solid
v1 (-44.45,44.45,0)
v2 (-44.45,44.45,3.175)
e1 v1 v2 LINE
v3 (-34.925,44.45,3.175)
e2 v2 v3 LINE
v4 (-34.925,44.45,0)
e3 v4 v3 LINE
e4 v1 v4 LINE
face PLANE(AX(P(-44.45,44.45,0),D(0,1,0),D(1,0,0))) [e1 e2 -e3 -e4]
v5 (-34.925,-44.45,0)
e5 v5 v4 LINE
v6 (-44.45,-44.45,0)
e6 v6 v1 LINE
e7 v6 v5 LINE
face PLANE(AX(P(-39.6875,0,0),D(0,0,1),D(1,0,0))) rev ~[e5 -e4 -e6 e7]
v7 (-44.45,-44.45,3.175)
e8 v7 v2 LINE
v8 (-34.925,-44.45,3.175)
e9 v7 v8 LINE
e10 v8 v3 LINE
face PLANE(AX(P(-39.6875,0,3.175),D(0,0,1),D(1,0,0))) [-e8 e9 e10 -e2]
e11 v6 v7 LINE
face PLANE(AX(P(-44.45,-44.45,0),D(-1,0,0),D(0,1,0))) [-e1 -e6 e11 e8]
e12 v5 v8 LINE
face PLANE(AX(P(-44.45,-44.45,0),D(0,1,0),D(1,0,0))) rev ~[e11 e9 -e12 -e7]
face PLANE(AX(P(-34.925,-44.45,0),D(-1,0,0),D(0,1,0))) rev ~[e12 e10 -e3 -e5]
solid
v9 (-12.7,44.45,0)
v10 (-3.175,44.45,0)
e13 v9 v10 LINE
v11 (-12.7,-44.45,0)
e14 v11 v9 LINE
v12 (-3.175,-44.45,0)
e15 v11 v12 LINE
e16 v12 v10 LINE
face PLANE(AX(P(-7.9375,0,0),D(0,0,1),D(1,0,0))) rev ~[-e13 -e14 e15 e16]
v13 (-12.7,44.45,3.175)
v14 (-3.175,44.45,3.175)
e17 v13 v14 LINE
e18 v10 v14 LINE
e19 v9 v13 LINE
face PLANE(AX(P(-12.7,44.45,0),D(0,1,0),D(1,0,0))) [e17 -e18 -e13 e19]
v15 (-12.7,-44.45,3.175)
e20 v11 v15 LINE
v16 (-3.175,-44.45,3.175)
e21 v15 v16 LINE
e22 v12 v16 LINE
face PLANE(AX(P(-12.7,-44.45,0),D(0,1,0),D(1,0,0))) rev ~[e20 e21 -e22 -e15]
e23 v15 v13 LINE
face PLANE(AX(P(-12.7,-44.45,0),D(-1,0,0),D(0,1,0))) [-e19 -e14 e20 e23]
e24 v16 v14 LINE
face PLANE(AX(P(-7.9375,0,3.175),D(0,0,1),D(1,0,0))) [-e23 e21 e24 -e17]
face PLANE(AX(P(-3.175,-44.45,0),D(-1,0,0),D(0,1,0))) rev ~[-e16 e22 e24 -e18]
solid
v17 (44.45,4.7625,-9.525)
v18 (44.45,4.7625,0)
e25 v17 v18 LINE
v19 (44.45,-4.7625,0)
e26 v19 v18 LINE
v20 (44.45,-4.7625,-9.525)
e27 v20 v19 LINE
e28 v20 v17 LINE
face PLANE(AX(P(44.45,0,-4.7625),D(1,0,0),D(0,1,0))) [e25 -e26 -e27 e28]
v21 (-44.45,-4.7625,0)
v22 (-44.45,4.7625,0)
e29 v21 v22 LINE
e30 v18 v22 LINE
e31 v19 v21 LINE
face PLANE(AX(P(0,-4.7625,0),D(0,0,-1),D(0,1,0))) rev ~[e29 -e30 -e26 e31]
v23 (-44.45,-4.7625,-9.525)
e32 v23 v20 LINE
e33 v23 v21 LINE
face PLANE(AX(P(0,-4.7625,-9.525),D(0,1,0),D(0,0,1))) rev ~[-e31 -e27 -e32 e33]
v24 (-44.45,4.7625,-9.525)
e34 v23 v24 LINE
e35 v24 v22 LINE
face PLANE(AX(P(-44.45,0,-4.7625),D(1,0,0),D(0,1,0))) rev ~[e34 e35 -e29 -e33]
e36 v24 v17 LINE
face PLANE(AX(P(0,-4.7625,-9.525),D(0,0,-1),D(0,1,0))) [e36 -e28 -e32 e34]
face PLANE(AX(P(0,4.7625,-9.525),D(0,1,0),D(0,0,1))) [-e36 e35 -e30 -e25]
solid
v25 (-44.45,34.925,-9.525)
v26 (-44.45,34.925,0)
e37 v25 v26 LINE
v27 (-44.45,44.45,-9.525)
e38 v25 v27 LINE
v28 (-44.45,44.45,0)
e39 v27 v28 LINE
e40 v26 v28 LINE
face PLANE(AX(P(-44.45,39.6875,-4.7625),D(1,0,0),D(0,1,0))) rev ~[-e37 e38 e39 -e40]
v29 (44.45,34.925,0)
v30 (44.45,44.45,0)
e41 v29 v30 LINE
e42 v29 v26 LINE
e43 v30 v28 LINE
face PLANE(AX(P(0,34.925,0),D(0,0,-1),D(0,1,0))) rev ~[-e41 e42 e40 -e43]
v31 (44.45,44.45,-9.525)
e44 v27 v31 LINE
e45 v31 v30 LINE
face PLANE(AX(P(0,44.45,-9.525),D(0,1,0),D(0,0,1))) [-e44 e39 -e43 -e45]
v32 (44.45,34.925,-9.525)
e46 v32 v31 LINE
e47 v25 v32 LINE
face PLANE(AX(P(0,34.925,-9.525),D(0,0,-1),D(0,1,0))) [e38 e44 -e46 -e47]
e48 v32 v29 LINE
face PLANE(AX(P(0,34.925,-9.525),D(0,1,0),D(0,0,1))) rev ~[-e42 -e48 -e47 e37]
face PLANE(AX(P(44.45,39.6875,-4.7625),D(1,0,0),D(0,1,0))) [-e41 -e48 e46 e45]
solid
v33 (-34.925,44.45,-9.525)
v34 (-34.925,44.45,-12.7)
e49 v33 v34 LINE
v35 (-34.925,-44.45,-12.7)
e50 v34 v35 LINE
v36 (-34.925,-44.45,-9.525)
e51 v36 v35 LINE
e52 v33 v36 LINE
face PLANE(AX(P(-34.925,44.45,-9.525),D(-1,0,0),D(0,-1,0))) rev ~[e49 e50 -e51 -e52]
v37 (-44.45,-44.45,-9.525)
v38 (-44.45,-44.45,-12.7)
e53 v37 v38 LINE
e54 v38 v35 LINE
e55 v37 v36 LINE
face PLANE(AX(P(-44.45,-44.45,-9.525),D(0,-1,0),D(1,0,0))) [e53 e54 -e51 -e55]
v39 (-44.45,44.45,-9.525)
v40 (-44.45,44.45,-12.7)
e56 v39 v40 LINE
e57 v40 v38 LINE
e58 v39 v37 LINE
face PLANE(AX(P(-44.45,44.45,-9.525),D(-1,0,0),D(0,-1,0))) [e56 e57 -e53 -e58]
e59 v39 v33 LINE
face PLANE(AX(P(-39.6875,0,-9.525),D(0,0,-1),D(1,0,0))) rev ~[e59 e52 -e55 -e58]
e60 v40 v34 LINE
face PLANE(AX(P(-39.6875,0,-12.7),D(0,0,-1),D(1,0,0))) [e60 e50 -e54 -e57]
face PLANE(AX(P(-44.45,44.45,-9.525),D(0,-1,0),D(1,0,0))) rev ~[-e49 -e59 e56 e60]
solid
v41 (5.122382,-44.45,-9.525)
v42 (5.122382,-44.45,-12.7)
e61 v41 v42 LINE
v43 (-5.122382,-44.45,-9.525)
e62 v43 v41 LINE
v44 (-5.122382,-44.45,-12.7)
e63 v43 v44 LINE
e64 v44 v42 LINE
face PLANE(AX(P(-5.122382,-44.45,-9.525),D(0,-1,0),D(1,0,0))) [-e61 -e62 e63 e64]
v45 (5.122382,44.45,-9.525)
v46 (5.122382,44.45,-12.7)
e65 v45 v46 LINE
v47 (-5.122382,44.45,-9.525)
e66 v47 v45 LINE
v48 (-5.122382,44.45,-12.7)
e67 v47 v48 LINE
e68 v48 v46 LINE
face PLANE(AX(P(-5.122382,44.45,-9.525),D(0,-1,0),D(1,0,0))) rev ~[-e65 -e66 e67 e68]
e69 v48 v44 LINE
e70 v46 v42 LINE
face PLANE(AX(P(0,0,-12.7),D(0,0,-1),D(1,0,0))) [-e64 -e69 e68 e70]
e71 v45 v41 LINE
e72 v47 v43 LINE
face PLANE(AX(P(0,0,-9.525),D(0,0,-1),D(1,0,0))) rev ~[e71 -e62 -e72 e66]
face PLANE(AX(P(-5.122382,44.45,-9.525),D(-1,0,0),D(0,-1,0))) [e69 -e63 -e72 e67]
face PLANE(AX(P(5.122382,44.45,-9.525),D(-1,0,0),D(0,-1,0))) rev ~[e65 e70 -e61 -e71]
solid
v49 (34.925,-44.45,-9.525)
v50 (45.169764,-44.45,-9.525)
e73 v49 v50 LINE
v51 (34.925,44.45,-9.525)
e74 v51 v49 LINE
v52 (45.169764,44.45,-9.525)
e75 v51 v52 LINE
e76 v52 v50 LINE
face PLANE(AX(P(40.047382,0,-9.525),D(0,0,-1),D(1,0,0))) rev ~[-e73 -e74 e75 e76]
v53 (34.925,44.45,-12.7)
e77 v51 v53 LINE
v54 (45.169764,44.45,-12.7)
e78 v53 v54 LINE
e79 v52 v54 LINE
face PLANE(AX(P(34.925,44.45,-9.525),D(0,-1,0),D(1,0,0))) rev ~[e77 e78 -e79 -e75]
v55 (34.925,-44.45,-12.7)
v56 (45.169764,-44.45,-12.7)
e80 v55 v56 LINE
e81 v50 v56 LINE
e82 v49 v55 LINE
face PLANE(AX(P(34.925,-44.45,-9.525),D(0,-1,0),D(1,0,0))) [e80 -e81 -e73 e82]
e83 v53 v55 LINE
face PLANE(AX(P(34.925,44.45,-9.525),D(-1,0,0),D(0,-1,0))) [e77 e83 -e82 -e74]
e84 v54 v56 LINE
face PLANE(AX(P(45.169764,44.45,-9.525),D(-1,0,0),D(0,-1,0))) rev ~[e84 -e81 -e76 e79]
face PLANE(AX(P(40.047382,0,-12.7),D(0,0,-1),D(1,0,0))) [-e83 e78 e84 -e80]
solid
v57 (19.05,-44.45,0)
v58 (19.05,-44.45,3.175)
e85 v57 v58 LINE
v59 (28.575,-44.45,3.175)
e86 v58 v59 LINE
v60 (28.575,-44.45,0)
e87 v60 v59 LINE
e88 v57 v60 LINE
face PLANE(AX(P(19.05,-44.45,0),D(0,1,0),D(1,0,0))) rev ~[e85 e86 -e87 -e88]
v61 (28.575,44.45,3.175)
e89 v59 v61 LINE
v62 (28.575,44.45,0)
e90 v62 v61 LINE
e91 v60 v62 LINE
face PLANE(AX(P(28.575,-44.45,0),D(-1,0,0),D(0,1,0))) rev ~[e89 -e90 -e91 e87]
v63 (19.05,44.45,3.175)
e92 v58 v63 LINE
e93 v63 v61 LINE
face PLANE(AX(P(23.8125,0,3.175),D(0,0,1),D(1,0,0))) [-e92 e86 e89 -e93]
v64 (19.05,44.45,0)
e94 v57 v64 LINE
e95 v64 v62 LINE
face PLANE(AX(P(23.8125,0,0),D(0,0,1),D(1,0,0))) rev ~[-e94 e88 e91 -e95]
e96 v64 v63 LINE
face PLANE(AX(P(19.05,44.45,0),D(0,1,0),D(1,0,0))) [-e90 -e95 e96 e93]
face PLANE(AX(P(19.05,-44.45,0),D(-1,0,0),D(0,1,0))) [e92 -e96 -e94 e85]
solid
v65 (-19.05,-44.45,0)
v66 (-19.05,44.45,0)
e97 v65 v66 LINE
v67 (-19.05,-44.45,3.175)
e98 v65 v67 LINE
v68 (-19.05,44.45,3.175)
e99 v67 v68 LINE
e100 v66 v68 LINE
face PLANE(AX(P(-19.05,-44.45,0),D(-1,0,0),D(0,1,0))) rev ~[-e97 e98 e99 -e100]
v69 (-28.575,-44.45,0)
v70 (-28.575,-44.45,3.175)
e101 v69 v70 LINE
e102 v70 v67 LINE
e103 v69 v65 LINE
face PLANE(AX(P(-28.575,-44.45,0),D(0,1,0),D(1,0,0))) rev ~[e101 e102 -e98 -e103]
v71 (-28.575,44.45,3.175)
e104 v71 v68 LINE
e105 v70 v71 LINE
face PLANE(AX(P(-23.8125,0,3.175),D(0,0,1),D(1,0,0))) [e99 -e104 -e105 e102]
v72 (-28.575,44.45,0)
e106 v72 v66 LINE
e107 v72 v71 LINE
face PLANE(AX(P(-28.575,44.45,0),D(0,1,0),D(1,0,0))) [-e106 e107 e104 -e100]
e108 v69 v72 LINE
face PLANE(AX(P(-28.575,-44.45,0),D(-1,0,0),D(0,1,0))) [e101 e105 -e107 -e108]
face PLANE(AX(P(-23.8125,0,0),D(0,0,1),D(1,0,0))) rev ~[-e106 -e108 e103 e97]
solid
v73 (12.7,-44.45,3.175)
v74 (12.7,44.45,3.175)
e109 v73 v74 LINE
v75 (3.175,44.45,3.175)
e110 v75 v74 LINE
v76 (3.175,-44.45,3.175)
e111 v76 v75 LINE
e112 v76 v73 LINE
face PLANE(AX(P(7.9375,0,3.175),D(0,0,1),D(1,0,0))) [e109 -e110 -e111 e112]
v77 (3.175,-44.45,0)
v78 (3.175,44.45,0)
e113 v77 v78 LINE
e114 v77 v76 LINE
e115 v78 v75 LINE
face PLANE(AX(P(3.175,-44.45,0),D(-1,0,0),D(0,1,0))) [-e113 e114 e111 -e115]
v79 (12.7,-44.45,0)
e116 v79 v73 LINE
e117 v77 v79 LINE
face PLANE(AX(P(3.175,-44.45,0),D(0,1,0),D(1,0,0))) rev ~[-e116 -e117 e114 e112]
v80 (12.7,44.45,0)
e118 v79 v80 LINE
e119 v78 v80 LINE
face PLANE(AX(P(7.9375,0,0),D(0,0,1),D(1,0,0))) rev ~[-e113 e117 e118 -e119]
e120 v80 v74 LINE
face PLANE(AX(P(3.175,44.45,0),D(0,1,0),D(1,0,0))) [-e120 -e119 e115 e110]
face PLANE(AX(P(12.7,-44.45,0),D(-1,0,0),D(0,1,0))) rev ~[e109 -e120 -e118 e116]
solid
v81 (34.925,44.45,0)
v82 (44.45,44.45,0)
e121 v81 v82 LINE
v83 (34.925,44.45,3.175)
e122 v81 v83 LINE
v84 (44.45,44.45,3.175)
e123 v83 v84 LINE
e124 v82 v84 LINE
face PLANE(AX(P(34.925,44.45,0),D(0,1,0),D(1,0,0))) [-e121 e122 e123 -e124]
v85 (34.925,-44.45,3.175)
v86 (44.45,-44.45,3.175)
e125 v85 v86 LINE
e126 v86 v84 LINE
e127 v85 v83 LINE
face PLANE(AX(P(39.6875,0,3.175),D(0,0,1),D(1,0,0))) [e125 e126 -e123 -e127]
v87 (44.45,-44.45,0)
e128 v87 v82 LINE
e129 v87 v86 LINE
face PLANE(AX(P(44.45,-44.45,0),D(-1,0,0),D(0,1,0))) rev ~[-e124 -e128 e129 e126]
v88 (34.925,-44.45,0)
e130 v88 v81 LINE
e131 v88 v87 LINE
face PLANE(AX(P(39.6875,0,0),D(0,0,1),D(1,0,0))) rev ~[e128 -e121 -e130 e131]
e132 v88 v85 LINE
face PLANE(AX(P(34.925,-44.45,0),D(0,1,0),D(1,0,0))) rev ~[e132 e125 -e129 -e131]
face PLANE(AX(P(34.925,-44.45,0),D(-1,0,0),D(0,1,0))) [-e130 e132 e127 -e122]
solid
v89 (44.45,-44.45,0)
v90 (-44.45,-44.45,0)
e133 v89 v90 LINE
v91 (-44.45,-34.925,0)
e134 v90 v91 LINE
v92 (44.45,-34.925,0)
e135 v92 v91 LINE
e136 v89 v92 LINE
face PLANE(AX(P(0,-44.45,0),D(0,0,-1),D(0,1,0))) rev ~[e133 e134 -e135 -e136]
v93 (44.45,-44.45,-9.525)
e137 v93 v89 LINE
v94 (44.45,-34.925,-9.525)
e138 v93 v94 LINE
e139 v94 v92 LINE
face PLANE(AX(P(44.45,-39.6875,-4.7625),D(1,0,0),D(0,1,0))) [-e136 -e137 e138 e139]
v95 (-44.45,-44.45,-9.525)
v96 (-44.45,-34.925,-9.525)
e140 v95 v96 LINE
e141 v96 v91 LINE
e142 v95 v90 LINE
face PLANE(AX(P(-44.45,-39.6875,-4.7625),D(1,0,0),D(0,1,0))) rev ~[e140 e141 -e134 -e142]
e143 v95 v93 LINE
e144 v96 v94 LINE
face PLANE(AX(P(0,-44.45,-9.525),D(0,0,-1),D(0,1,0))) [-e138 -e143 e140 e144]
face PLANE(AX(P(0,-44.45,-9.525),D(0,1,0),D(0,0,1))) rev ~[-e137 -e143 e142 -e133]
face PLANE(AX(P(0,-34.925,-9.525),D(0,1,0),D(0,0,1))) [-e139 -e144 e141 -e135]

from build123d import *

# Parameters (mm, degrees)
F1_W          = 9.525
F1_H          = 88.9
F2_DEPTH      = 3.175
F3_W          = 9.525
F3_H          = 9.525
F4_DEPTH      = 44.45
F4_DEPTH_BACK = 44.45
F5_W          = 10.2447643876
F5_H          = 88.9
F6_DEPTH      = 3.175
F5_W_2        = 9.5249999999


# Not quite as in the source:
# - a variable given as a bare number and used for a length is read in inches; the dataset says mm whatever the document's units were


with BuildPart() as f2:
    # F1 (on Top) → F2 (new body)
    with BuildSketch(Plane.XY):
        with Locations((-39.6875, 0)):
            Rectangle(F1_W, F1_H)
    extrude(amount=F2_DEPTH)


with BuildPart() as f2b:
    # F1 (on Top) → F2, piece 2 (new body)
    with BuildSketch(Plane.XY):
        with Locations((-23.8125, 0)):
            Rectangle(F1_W, F1_H)
    extrude(amount=F2_DEPTH)


with BuildPart() as f2c:
    # F1 (on Top) → F2, piece 3 (new body)
    with BuildSketch(Plane.XY):
        with Locations((-7.9375, 0)):
            Rectangle(F1_W, F1_H)
    extrude(amount=F2_DEPTH)


with BuildPart() as f2d:
    # F1 (on Top) → F2, piece 4 (new body)
    with BuildSketch(Plane.XY):
        with Locations((7.9375, 0)):
            Rectangle(F1_W, F1_H)
    extrude(amount=F2_DEPTH)


with BuildPart() as f2e:
    # F1 (on Top) → F2, piece 5 (new body)
    with BuildSketch(Plane.XY):
        with Locations((23.8125, 0)):
            Rectangle(F1_W, F1_H)
    extrude(amount=F2_DEPTH)


with BuildPart() as f2f:
    # F1 (on Top) → F2, piece 6 (new body)
    with BuildSketch(Plane.XY):
        with Locations((39.6875, 0)):
            Rectangle(F1_W, F1_H)
    extrude(amount=F2_DEPTH)


with BuildPart() as f4:
    # F3 (on Right) → F4 (new body, two sides)
    with BuildSketch(Plane.YZ) as f4_sk:
        with Locations((-39.6875, -4.7625)):
            Rectangle(F3_W, F3_H)
    extrude(amount=F4_DEPTH)
    extrude(f4_sk.sketch, amount=-F4_DEPTH_BACK)


with BuildPart() as f4b:
    # F3 (on Right) → F4, piece 2 (new body, two sides)
    with BuildSketch(Plane.YZ) as f4_2_sk:
        with Locations((39.6875, -4.7625)):
            Rectangle(F3_W, F3_H)
    extrude(amount=F4_DEPTH)
    extrude(f4_2_sk.sketch, amount=-F4_DEPTH_BACK)


with BuildPart() as f4c:
    # F3 (on Right) → F4, piece 3 (new body, two sides)
    with BuildSketch(Plane.YZ) as f4_3_sk:
        with Locations((0, -4.7625)):
            Rectangle(F3_W, F3_H)
    extrude(amount=F4_DEPTH)
    extrude(f4_3_sk.sketch, amount=-F4_DEPTH_BACK)


with BuildPart() as f6:
    # F5 (on face) → F6 (new body)
    with BuildSketch(Plane(origin=(0, 0, -9.525), x_dir=(1, 0, 0), z_dir=(0, 0, -1))):
        with Locations((40.0473821938, 0)):
            Rectangle(F5_W, F5_H)
    extrude(amount=F6_DEPTH)


with BuildPart() as f6b:
    # F5 (on face) → F6, piece 2 (new body)
    with BuildSketch(Plane(origin=(0, 0, -9.525), x_dir=(1, 0, 0), z_dir=(0, 0, -1))):
        with Locations((-39.6874999999, 0)):
            Rectangle(F5_W_2, F5_H)
    extrude(amount=F6_DEPTH)


with BuildPart() as f6c:
    # F5 (on face) → F6, piece 3 (new body)
    with BuildSketch(Plane(origin=(0, 0, -9.525), x_dir=(1, 0, 0), z_dir=(0, 0, -1))):
        Rectangle(F5_W, F5_H)
    extrude(amount=F6_DEPTH)


solid = Compound([f2.part, f2b.part, f2c.part, f2d.part, f2e.part, f2f.part, f4.part, f4b.part, f4c.part, f6.part, f6b.part, f6c.part])
